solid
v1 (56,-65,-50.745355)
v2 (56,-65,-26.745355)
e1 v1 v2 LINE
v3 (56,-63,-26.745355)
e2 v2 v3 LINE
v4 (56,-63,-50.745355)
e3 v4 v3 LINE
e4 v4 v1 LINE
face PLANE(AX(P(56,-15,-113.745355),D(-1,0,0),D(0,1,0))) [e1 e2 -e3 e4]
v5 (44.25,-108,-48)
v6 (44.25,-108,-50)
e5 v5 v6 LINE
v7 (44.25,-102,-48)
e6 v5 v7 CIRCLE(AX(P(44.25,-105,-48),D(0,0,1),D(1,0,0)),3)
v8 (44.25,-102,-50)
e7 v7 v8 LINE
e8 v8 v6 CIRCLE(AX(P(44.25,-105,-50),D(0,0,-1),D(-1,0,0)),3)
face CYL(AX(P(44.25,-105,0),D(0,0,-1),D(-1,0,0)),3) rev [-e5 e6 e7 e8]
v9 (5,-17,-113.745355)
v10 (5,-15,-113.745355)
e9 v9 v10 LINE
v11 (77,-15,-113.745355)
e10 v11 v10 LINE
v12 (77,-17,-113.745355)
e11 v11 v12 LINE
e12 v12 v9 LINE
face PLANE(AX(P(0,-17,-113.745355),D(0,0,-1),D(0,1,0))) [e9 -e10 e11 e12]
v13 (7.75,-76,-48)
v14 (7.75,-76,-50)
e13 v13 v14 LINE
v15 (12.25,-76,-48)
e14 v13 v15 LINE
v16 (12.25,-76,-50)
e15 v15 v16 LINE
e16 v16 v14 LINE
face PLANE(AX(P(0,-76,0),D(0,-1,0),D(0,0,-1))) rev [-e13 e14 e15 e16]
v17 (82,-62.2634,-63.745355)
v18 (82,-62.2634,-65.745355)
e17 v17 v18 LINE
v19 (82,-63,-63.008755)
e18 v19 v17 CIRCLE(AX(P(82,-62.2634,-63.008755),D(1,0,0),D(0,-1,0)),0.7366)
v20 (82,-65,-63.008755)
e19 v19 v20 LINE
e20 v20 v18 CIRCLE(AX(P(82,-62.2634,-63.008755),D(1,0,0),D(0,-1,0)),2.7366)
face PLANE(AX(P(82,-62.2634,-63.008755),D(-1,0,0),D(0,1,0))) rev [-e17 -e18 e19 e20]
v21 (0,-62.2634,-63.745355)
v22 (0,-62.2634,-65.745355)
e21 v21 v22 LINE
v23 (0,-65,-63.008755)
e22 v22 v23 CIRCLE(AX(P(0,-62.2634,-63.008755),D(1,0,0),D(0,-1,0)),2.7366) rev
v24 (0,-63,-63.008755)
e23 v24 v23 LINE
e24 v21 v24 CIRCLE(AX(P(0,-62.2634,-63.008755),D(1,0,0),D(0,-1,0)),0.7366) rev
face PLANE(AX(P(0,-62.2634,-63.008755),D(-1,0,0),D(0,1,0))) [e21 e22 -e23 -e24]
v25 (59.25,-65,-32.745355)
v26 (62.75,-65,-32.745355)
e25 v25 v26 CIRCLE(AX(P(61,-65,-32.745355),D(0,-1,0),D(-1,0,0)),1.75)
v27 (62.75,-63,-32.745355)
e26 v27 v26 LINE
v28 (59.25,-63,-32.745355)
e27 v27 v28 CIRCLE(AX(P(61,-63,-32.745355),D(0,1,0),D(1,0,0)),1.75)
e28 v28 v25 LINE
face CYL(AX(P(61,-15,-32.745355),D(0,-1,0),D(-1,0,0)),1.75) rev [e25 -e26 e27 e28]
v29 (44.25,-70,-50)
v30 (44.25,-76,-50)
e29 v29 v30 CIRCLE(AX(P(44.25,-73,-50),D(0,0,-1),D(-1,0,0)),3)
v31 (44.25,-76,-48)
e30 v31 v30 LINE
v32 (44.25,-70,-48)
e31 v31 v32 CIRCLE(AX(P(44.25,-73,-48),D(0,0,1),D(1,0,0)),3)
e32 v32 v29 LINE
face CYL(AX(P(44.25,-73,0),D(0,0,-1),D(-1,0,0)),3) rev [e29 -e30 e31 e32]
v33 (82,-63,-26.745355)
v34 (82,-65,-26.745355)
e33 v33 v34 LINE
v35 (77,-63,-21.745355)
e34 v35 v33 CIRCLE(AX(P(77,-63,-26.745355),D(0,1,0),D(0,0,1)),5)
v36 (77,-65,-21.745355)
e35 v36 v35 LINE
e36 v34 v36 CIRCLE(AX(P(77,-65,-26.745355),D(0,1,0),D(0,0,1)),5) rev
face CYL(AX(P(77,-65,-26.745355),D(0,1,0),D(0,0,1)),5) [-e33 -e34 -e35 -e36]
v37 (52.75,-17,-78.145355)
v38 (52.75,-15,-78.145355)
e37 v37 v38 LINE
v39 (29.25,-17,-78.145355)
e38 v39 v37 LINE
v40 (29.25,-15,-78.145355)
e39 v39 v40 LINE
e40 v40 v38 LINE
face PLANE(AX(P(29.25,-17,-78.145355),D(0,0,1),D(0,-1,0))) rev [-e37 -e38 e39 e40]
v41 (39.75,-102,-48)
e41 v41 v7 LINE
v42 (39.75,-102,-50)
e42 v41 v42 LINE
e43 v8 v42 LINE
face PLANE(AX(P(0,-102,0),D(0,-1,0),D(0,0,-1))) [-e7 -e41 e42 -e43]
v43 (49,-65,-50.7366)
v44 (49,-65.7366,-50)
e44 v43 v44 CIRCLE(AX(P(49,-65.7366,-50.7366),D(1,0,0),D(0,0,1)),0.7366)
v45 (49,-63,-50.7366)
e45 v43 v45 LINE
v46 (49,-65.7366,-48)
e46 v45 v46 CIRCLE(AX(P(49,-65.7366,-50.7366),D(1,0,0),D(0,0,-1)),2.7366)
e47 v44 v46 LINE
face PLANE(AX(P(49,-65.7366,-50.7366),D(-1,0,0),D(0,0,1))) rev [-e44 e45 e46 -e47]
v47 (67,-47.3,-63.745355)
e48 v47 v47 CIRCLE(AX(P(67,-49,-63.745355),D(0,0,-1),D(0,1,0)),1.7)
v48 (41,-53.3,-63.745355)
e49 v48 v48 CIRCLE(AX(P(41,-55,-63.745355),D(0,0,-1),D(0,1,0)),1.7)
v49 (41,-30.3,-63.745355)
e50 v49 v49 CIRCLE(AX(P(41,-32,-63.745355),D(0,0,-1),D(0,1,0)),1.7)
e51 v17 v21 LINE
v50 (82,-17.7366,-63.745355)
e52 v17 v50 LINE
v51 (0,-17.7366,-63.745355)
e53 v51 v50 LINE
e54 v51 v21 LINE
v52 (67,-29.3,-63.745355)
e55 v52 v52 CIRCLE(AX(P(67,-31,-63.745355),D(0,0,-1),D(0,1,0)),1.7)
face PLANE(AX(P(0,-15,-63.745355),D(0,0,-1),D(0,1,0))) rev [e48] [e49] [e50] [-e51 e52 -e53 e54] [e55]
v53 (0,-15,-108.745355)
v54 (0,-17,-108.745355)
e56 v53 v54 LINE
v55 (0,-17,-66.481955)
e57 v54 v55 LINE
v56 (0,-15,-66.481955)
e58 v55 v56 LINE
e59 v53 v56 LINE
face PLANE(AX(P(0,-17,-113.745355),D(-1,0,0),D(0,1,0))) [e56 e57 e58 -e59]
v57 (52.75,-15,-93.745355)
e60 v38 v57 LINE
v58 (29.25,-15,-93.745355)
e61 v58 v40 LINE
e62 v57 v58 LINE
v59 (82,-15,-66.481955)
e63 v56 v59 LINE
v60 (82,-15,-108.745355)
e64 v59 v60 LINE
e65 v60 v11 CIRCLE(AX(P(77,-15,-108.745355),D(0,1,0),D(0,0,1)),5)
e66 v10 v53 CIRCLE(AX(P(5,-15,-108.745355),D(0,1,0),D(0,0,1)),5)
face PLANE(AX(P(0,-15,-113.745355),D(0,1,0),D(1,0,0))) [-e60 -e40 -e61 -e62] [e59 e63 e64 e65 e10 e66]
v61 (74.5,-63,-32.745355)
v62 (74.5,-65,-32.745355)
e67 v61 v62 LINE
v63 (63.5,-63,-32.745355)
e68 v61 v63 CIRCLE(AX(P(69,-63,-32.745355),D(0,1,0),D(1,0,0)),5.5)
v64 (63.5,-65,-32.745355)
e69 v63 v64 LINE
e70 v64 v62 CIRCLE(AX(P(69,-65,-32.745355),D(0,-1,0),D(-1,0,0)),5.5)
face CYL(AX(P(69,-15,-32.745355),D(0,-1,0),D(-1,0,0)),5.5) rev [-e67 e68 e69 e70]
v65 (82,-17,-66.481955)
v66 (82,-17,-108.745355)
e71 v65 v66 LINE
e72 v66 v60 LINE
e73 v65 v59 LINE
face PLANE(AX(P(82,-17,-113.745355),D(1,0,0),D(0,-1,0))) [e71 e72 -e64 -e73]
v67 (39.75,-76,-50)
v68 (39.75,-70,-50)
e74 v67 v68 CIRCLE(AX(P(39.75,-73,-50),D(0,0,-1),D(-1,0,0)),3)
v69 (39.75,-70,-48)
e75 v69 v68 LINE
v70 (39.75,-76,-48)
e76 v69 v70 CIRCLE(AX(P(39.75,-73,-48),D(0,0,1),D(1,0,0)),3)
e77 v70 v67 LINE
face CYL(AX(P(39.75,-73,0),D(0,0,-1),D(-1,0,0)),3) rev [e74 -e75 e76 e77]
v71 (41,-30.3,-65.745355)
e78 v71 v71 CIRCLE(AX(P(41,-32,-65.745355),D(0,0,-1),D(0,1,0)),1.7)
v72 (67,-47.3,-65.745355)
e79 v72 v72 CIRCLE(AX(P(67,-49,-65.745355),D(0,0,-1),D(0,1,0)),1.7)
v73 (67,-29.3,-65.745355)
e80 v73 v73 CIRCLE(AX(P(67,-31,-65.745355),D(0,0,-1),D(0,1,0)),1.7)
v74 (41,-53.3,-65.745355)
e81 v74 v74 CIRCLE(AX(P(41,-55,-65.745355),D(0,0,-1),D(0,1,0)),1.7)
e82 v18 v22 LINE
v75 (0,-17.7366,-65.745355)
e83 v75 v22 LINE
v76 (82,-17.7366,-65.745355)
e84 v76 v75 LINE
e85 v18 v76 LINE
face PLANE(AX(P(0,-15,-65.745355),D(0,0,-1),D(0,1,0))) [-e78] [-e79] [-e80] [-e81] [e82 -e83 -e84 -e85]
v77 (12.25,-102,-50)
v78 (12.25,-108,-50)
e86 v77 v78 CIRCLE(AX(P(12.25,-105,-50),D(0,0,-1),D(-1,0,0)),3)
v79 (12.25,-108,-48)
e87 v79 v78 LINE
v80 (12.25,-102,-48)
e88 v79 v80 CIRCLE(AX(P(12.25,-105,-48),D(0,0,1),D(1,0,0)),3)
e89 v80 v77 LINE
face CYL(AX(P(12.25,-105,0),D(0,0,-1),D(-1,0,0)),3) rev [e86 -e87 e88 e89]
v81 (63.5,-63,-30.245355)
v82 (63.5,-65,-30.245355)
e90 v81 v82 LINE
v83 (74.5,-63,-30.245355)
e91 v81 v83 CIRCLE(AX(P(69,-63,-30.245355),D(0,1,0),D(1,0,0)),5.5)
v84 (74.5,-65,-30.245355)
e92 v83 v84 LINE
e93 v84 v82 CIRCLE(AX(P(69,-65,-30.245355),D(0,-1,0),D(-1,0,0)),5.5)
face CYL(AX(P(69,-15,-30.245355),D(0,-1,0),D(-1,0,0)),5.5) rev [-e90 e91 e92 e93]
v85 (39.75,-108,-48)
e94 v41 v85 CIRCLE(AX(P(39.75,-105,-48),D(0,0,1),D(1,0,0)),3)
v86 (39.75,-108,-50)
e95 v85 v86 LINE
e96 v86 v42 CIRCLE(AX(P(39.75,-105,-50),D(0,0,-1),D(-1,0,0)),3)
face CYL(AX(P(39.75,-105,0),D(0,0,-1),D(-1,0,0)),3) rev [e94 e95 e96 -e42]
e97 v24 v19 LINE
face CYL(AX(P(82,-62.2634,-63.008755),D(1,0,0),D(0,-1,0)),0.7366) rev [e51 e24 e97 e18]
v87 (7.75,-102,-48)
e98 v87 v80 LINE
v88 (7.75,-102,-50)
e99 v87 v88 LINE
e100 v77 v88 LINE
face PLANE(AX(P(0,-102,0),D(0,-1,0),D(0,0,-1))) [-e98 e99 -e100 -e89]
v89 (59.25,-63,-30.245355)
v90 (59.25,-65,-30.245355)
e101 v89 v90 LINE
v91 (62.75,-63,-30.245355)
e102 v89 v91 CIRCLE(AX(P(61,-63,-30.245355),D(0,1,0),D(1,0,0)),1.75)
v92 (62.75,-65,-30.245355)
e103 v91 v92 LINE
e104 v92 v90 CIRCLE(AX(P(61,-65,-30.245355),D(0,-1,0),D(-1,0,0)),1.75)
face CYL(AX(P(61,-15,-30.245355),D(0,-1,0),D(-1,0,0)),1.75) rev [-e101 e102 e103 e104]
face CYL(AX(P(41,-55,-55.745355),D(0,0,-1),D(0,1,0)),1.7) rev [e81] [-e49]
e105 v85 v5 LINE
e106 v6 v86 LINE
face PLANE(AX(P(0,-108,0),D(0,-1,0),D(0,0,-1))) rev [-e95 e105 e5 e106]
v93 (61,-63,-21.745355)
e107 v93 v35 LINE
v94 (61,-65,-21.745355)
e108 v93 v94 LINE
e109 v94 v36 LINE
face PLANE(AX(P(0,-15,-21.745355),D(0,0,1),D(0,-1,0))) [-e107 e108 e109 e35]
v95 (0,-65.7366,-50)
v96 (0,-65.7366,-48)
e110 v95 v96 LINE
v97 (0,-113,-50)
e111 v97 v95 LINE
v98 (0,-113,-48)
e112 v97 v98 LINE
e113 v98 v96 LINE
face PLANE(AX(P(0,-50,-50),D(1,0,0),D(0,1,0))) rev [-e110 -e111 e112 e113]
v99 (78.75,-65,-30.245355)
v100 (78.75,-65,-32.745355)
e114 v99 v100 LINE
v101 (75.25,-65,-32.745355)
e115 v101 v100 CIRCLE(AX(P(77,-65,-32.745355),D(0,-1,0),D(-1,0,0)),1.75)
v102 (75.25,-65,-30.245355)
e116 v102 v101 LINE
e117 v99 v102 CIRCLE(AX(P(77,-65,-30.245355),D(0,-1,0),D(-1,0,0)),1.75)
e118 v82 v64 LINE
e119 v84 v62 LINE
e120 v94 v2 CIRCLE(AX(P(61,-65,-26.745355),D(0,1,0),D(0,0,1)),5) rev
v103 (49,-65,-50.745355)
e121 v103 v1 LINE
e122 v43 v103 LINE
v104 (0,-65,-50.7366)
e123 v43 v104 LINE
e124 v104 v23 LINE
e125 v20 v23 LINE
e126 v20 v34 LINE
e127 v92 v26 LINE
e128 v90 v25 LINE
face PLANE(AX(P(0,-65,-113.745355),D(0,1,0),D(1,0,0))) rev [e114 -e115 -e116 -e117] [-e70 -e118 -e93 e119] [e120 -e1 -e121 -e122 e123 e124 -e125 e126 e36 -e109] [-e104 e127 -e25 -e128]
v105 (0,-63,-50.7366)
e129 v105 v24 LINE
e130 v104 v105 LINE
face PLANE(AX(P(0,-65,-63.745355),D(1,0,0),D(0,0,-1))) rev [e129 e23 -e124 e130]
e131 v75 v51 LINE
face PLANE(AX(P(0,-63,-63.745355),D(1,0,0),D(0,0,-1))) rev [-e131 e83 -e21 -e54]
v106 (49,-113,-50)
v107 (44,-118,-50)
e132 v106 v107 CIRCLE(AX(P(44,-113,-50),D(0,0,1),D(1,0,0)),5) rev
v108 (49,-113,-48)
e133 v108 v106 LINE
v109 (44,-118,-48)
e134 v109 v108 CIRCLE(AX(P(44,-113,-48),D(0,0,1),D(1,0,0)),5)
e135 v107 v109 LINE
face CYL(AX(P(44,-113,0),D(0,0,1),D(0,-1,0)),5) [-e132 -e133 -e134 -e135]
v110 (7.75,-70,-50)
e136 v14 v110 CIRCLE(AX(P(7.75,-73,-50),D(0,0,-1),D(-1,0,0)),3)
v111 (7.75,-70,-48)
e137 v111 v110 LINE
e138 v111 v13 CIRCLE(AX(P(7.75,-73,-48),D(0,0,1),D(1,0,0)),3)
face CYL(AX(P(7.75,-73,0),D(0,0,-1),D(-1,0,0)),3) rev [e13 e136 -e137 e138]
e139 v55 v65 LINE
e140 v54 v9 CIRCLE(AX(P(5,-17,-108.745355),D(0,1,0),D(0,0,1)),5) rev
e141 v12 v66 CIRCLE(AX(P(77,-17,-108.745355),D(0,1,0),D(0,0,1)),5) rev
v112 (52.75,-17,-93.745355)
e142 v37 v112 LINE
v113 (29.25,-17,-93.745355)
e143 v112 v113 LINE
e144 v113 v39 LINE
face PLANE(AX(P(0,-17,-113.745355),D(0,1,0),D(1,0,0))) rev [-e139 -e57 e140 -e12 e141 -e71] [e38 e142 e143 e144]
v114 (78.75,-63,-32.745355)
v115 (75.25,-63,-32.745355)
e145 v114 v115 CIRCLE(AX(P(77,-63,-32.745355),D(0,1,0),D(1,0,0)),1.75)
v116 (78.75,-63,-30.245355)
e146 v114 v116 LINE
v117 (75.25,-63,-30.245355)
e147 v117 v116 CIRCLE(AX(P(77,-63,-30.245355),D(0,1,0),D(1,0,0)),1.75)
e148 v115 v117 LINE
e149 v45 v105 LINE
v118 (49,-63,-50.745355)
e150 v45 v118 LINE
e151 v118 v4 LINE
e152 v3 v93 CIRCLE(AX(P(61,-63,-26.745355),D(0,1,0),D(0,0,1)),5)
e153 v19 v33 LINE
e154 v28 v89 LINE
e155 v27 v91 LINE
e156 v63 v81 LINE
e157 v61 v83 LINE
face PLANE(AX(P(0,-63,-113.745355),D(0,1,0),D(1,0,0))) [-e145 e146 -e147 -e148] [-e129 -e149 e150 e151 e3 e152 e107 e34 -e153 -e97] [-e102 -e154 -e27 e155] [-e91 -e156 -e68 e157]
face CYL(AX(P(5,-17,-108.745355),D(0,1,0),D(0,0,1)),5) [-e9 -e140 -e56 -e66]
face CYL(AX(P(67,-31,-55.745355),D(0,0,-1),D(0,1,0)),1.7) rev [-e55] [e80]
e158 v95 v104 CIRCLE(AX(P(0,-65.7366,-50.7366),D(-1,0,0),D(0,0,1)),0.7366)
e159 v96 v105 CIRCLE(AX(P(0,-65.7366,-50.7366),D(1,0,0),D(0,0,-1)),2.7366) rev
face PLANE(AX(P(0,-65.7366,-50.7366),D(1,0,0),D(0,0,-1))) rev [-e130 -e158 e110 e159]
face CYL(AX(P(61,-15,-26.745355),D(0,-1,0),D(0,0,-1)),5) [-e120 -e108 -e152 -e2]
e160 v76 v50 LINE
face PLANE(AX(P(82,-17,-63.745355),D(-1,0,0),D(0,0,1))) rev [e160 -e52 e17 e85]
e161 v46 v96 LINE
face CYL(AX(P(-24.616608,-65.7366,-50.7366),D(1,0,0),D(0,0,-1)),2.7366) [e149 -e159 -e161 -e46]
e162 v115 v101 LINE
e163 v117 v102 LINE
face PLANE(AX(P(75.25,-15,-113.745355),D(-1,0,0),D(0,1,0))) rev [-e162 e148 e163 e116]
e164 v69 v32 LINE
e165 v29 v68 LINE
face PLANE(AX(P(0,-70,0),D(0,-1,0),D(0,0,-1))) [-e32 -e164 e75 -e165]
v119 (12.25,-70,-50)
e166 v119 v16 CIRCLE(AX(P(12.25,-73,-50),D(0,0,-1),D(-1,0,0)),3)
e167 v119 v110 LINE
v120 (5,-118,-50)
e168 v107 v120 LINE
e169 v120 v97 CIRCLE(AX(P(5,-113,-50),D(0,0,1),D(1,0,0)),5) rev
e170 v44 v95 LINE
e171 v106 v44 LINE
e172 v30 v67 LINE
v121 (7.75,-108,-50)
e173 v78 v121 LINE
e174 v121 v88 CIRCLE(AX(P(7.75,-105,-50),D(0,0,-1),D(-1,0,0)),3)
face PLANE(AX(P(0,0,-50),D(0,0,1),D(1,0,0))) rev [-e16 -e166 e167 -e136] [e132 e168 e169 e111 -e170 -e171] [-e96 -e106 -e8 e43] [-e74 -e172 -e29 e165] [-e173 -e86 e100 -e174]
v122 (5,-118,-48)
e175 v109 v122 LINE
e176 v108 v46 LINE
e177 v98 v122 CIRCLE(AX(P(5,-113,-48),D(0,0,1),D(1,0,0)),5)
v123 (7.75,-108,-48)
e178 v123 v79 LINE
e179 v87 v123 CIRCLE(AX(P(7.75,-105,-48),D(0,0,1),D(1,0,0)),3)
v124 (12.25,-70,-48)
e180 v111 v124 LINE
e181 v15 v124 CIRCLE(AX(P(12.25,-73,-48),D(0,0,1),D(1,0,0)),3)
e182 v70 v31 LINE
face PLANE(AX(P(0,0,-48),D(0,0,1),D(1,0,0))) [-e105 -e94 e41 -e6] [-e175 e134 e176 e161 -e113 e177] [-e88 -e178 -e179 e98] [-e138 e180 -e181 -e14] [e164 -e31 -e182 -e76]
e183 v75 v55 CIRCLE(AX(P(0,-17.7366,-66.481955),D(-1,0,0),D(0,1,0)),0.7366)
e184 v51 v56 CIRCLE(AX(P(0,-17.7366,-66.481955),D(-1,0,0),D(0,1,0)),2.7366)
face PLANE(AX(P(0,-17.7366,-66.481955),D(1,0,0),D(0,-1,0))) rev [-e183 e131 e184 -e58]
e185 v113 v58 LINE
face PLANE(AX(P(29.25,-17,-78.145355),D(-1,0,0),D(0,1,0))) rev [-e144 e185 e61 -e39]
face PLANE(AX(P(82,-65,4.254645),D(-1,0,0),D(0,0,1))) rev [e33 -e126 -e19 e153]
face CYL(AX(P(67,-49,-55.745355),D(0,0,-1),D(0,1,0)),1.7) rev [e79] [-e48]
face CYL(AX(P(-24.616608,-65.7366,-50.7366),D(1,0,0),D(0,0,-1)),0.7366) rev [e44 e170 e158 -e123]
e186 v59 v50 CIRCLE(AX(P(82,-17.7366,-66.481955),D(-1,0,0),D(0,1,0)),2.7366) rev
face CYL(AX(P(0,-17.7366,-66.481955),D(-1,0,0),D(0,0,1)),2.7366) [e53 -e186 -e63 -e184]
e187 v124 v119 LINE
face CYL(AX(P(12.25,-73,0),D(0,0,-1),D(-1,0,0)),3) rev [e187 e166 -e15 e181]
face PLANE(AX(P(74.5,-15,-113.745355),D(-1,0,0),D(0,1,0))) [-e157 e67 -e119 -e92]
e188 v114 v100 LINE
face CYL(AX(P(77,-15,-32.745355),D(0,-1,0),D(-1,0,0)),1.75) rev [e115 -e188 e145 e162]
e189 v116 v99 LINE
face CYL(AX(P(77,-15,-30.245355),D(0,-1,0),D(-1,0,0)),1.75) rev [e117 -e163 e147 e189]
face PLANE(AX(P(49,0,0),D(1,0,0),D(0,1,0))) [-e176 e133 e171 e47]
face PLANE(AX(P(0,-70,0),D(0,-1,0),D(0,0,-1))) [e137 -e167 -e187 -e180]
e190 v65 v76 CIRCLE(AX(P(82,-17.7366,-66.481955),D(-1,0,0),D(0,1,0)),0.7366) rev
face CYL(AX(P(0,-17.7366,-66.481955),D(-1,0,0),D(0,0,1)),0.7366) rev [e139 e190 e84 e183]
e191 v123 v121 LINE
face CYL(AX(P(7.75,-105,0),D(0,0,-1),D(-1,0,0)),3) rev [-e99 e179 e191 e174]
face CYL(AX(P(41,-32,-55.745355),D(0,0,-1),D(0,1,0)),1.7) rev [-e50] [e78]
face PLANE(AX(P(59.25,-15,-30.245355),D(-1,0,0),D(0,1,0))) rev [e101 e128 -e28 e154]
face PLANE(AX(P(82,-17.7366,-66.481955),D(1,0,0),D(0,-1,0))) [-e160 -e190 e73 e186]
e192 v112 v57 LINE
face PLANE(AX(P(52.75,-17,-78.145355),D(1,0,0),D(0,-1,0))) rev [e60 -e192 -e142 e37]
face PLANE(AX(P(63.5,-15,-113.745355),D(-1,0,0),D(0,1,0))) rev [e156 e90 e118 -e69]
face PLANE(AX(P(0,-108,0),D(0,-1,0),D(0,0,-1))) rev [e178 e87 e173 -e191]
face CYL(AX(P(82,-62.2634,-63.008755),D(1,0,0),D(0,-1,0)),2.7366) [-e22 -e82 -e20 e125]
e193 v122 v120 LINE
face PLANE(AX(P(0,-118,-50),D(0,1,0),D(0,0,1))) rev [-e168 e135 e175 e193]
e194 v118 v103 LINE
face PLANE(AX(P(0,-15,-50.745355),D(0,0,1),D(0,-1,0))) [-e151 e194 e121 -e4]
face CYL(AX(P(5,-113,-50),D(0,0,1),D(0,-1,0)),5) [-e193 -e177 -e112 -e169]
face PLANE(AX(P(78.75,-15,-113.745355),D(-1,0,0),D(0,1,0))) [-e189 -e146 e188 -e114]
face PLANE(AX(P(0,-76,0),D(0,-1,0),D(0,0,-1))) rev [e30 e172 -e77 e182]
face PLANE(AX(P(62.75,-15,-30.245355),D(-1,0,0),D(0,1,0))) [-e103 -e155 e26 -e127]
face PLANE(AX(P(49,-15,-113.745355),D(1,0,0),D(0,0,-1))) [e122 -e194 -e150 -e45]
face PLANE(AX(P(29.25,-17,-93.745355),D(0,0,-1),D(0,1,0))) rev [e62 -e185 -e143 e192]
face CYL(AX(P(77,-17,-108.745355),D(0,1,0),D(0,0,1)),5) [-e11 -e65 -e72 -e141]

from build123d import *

# Parameters (mm, degrees)
SKETCH1_W                    = 82
SKETCH1_H                    = 50
SKETCH1_W_2                  = 23.5
SKETCH1_H_2                  = 15.6
BASE_FLANGE1_DEPTH           = 2
EDGE_FLANGE1_STRIP_W         = 9.4732
EDGE_FLANGE1_STRIP_H         = 2
EDGE_FLANGE1_STRIP_CUT_DEPTH = 82
EDGE_FLANGE1_DEPTH           = 82
EDGE_FLANGE2_STRIP_W         = 9.4732
EDGE_FLANGE2_STRIP_H         = 2
EDGE_FLANGE2_STRIP_CUT_DEPTH = 82
EDGE_FLANGE2_DEPTH           = 82
CUT_EXTRUDE1_DEPTH           = 153.144667997
CUT_EXTRUDE1_DEPTH_BACK      = 153.144667997
SKETCHED_START               = -63
SKETCHED_BEND2_OUTLINE_W     = 82
SKETCHED_BEND2_OUTLINE_H     = 50
SKETCHED_BEND2_DEPTH         = 63
SKETCHED_START_2             = -92
SKETCHED_BEND2_2_OUTLINE_W   = 26
SKETCHED_BEND2_2_OUTLINE_H   = 2
SKETCHED_BEND2_2_DEPTH       = 27
SKETCHED_START_3             = -62.2634
SKETCHED_BEND2_3_OUTLINE_W   = 82
SKETCHED_BEND2_3_OUTLINE_H   = 2
SKETCHED_BEND2_3_DEPTH       = 44.5268
SKETCHED_START_4             = -65
SKETCHED_BEND2_4_OUTLINE_W   = 26
SKETCHED_BEND2_4_OUTLINE_H   = 26.254644901
SKETCHED_BEND2_4_DEPTH       = 2
SKETCHED_BEND2_5_DEPTH       = 49
SKETCHED_BEND2_6_OUTLINE_W   = 2
SKETCHED_BEND2_6_OUTLINE_H   = 20
SKETCHED_BEND2_6_DEPTH       = 82
SKETCHED_BEND2_7_OUTLINE_W   = 2
SKETCHED_BEND2_7_OUTLINE_H   = 15.6
SKETCHED_BEND2_7_DEPTH       = 29.25
SKETCHED_START_5             = 52.75
SKETCHED_BEND2_8_OUTLINE_W   = 2
SKETCHED_BEND2_8_OUTLINE_H   = 15.6
SKETCHED_BEND2_8_DEPTH       = 29.25
SKETCHED_START_6             = 56
SKETCHED_BEND2_9_OUTLINE_W   = 2
SKETCHED_BEND2_9_OUTLINE_H   = 0.745355099
SKETCHED_BEND2_9_DEPTH       = 26
SKETCHED_START_7             = 29.25
SKETCHED_BEND2_10_DEPTH      = 19.75
FILLET1_R                    = 5
SKETCH19_R                   = 1.7
CUT_EXTRUDE2_DEPTH           = 10


with BuildPart() as part:
    # Base-Flange1: sheet metal written as solids
    # Sketch1 → Base-Flange1 (new body)
    with BuildSketch(Plane.XY):
        with Locations((41, -25)):
            Rectangle(SKETCH1_W, SKETCH1_H)
        with Locations((41, -27.8)):
            Rectangle(SKETCH1_W_2, SKETCH1_H_2, mode=Mode.SUBTRACT)
    extrude(amount=-BASE_FLANGE1_DEPTH)

    # Edge-Flange1: sheet metal written as solids
    # Edge-Flange1 strip (on a plane across the edge) → Edge-Flange1 strip cut (cut)
    with BuildSketch(Plane(origin=(82, -50, -2), x_dir=(0, 1, 0), z_dir=(-1, 0, 0))):
        with Locations((-2, -1)):
            Rectangle(EDGE_FLANGE1_STRIP_W, EDGE_FLANGE1_STRIP_H)
    extrude(amount=EDGE_FLANGE1_STRIP_CUT_DEPTH, mode=Mode.SUBTRACT)

    # Edge-Flange1 section (on a plane across the edge) → Edge-Flange1 (add)
    with BuildSketch(Plane(origin=(82, -50, -2), x_dir=(0, 1, 0), z_dir=(-1, 0, 0))):
        with BuildLine():
            Line((0, 0.7366), (0, 46))
            Line((0, 46), (2, 46))
            Line((2, 46), (2, 0.7366))
            ThreePointArc((2, 0.7366), (2.215745145, 0.215745145), (2.7366, 0))
            Line((2.7366, 0), (2.7366, -2))
            ThreePointArc((2.7366, -2), (0.801531583, -1.198468417), (0, 0.7366))
        make_face()
    extrude(amount=EDGE_FLANGE1_DEPTH)

    # Edge-Flange2: sheet metal written as solids
    # Edge-Flange2 strip (on a plane across the edge) → Edge-Flange2 strip cut (cut)
    with BuildSketch(Plane(origin=(0, -50, -48), x_dir=(0, 0, 1), z_dir=(1, 0, 0))):
        with Locations((-4, -1)):
            Rectangle(EDGE_FLANGE2_STRIP_W, EDGE_FLANGE2_STRIP_H)
    extrude(amount=EDGE_FLANGE2_STRIP_CUT_DEPTH, mode=Mode.SUBTRACT)

    # Edge-Flange2 section (on a plane across the edge) → Edge-Flange2 (add)
    with BuildSketch(Plane(origin=(0, -50, -48), x_dir=(0, 0, 1), z_dir=(1, 0, 0))):
        with BuildLine():
            Line((-2, 0.7366), (-2, 68))
            Line((-2, 68), (0, 68))
            Line((0, 68), (0, 0.7366))
            ThreePointArc((0, 0.7366), (0.215745145, 0.215745145), (0.7366, 0))
            Line((0.7366, 0), (0.7366, -2))
            ThreePointArc((0.7366, -2), (-1.198468417, -1.198468417), (-2, 0.7366))
        make_face()
    extrude(amount=EDGE_FLANGE2_DEPTH)

    # Sketch12 → Cut-Extrude1 (cut, two sides: drawn at the far end of the back side and taken through both)
    with BuildSketch(Plane(origin=(0, 0, -50), x_dir=(-1, 0, 0), z_dir=(0, 0, -1)).offset(-CUT_EXTRUDE1_DEPTH_BACK)):
        Polygon((-56, -92), (-82, -92), (-82, -118), (-49, -118), (-49, -63), (-56, -63), align=None)
        with BuildLine():
            Line((-75.25, -83.5), (-75.25, -81))
            ThreePointArc((-75.25, -81), (-77, -79.25), (-78.75, -81))
            Line((-78.75, -81), (-78.75, -83.5))
            ThreePointArc((-78.75, -83.5), (-77, -85.25), (-75.25, -83.5))
        make_face()
        with BuildLine():
            Line((-63.5, -83.5), (-63.5, -81))
            ThreePointArc((-63.5, -81), (-69, -75.5), (-74.5, -81))
            Line((-74.5, -81), (-74.5, -83.5))
            ThreePointArc((-74.5, -83.5), (-69, -89), (-63.5, -83.5))
        make_face()
        with BuildLine():
            Line((-44.25, -76), (-39.75, -76))
            ThreePointArc((-39.75, -76), (-36.75, -73), (-39.75, -70))
            Line((-39.75, -70), (-44.25, -70))
            ThreePointArc((-44.25, -70), (-47.25, -73), (-44.25, -76))
        make_face()
        with BuildLine():
            Line((-12.25, -76), (-7.75, -76))
            ThreePointArc((-7.75, -76), (-4.75, -73), (-7.75, -70))
            Line((-7.75, -70), (-12.25, -70))
            ThreePointArc((-12.25, -70), (-15.25, -73), (-12.25, -76))
        make_face()
        with BuildLine():
            Line((-12.25, -108), (-7.75, -108))
            ThreePointArc((-7.75, -108), (-4.75, -105), (-7.75, -102))
            Line((-7.75, -102), (-12.25, -102))
            ThreePointArc((-12.25, -102), (-15.25, -105), (-12.25, -108))
        make_face()
        with BuildLine():
            Line((-44.25, -108), (-39.75, -108))
            ThreePointArc((-39.75, -108), (-36.75, -105), (-39.75, -102))
            Line((-39.75, -102), (-44.25, -102))
            ThreePointArc((-44.25, -102), (-47.25, -105), (-44.25, -108))
        make_face()
        with BuildLine():
            ThreePointArc((-59.25, -81), (-61, -79.25), (-62.75, -81))
            Line((-62.75, -81), (-62.75, -83.5))
            ThreePointArc((-62.75, -83.5), (-61, -85.25), (-59.25, -83.5))
            Line((-59.25, -83.5), (-59.25, -81))
        make_face()
    extrude(amount=CUT_EXTRUDE1_DEPTH + CUT_EXTRUDE1_DEPTH_BACK, mode=Mode.SUBTRACT)

    # Sketched Bend2: read off the stored shape, not the designer's step
    # Sketched Bend2 outline → Sketched Bend2 (cut)
    with BuildSketch(Plane(origin=(0, 0, 0), x_dir=(1, 0, 0), z_dir=(0, 1, 0)).offset(SKETCHED_START)):
        with Locations((41, 25)):
            Rectangle(SKETCHED_BEND2_OUTLINE_W, SKETCHED_BEND2_OUTLINE_H)
    extrude(amount=SKETCHED_BEND2_DEPTH, mode=Mode.SUBTRACT)

    # Sketched Bend2 2 outline → Sketched Bend2 2 (cut)
    with BuildSketch(Plane(origin=(0, 0, 0), x_dir=(1, 0, 0), z_dir=(0, 1, 0)).offset(SKETCHED_START_2)):
        with Locations((69, 49)):
            Rectangle(SKETCHED_BEND2_2_OUTLINE_W, SKETCHED_BEND2_2_OUTLINE_H)
    extrude(amount=SKETCHED_BEND2_2_DEPTH, mode=Mode.SUBTRACT)

    # Sketched Bend2 4 outline → Sketched Bend2 4 (add)
    with BuildSketch(Plane(origin=(0, 0, 0), x_dir=(1, 0, 0), z_dir=(0, 1, 0)).offset(SKETCHED_START_4)):
        with Locations((69, 34.872677549)):
            Rectangle(SKETCHED_BEND2_4_OUTLINE_W, SKETCHED_BEND2_4_OUTLINE_H)
        with BuildLine():
            Line((59.25, 30.245355099), (59.25, 32.745355099))
            ThreePointArc((59.25, 32.745355099), (61, 34.495355099), (62.75, 32.745355099))
            Line((62.75, 32.745355099), (62.75, 30.245355099))
            ThreePointArc((62.75, 30.245355099), (61, 28.495355099), (59.25, 30.245355099))
        make_face(mode=Mode.SUBTRACT)
        with BuildLine():
            Line((63.5, 30.245355099), (63.5, 32.745355099))
            ThreePointArc((63.5, 32.745355099), (69, 38.245355099), (74.5, 32.745355099))
            Line((74.5, 32.745355099), (74.5, 30.245355099))
            ThreePointArc((74.5, 30.245355099), (69, 24.745355099), (63.5, 30.245355099))
        make_face(mode=Mode.SUBTRACT)
        with BuildLine():
            Line((75.25, 30.245355099), (75.25, 32.745355099))
            ThreePointArc((75.25, 32.745355099), (77, 34.495355099), (78.75, 32.745355099))
            Line((78.75, 32.745355099), (78.75, 30.245355099))
            ThreePointArc((78.75, 30.245355099), (77, 28.495355099), (75.25, 30.245355099))
        make_face(mode=Mode.SUBTRACT)
    extrude(amount=SKETCHED_BEND2_4_DEPTH)

    # Sketched Bend2 5 outline → Sketched Bend2 5 (cut)
    with BuildSketch(Plane.YZ):
        with BuildLine():
            ThreePointArc((-65.7366, -48), (-64.082332791, -48.556604688), (-63.100997602, -50))
            Line((-63.100997602, -50), (-63, -50))
            Line((-63, -50), (-63, -48))
            Line((-63, -48), (-65.7366, -48))
        make_face()
    extrude(amount=SKETCHED_BEND2_5_DEPTH, mode=Mode.SUBTRACT)



with BuildPart() as body_2:
    # Sketched Bend2 3 outline → Sketched Bend2 3 (new body)
    with BuildSketch(Plane(origin=(0, 0, 0), x_dir=(1, 0, 0), z_dir=(0, 1, 0)).offset(SKETCHED_START_3)):
        with Locations((41, 64.745355099)):
            Rectangle(SKETCHED_BEND2_3_OUTLINE_W, SKETCHED_BEND2_3_OUTLINE_H)
    extrude(amount=SKETCHED_BEND2_3_DEPTH)

    # Sketched Bend2 6 outline → Sketched Bend2 6 (add)
    with BuildSketch(Plane.YZ):
        with BuildLine():
            Line((-65, -50.745355099), (-65, -63.008755099))
            ThreePointArc((-65, -63.008755099), (-64.198468417, -64.943823516), (-62.2634, -65.745355099))
            Line((-62.2634, -65.745355099), (-62.2634, -63.745355099))
            ThreePointArc((-62.2634, -63.745355099), (-62.784254855, -63.529609954), (-63, -63.008755099))
            Line((-63, -63.008755099), (-63, -50.745355099))
            Line((-63, -50.745355099), (-65, -50.745355099))
        make_face()
        with Locations((-16, -103.745355099)):
            Rectangle(SKETCHED_BEND2_6_OUTLINE_W, SKETCHED_BEND2_6_OUTLINE_H)
        with BuildLine():
            Line((-17, -66.481955099), (-17, -78.145355099))
            Line((-17, -78.145355099), (-15, -78.145355099))
            Line((-15, -78.145355099), (-15, -66.481955099))
            ThreePointArc((-15, -66.481955099), (-15.801531582, -64.546886681), (-17.7366, -63.745355099))
            Line((-17.7366, -63.745355099), (-17.7366, -65.745355099))
            ThreePointArc((-17.7366, -65.745355099), (-17.215745145, -65.961100244), (-17, -66.481955099))
        make_face()
    extrude(amount=SKETCHED_BEND2_6_DEPTH)


with BuildPart() as part_1:
    add(part.part)

    add(body_2.part)  # Sketched Bend2 7 merges body 2
    # Sketched Bend2 7 outline → Sketched Bend2 7 (add)
    with BuildSketch(Plane.YZ):
        with BuildLine():
            Line((-65, -50.7366), (-65, -50.745355099))
            Line((-65, -50.745355099), (-63, -50.745355099))
            Line((-63, -50.745355099), (-63, -50.7366))
            ThreePointArc((-63, -50.7366), (-63.025366971, -50.364854094), (-63.100997602, -50))
            Line((-63.100997602, -50), (-65.7366, -50))
            ThreePointArc((-65.7366, -50), (-65.215745145, -50.215745145), (-65, -50.7366))
        make_face()
        with Locations((-16, -85.945355099)):
            Rectangle(SKETCHED_BEND2_7_OUTLINE_W, SKETCHED_BEND2_7_OUTLINE_H)
    extrude(amount=SKETCHED_BEND2_7_DEPTH)

    # Sketched Bend2 8 outline → Sketched Bend2 8 (add)
    with BuildSketch(Plane.YZ.offset(SKETCHED_START_5)):
        with Locations((-16, -85.945355099)):
            Rectangle(SKETCHED_BEND2_8_OUTLINE_W, SKETCHED_BEND2_8_OUTLINE_H)
    extrude(amount=SKETCHED_BEND2_8_DEPTH)

    # Sketched Bend2 9 outline → Sketched Bend2 9 (add)
    with BuildSketch(Plane.YZ.offset(SKETCHED_START_6)):
        with Locations((-64, -50.372677549)):
            Rectangle(SKETCHED_BEND2_9_OUTLINE_W, SKETCHED_BEND2_9_OUTLINE_H)
    extrude(amount=SKETCHED_BEND2_9_DEPTH)

    # Sketched Bend2 10 outline → Sketched Bend2 10 (add)
    with BuildSketch(Plane.YZ.offset(SKETCHED_START_7)):
        with BuildLine():
            Line((-65, -50.7366), (-65, -50.745355099))
            Line((-65, -50.745355099), (-63, -50.745355099))
            Line((-63, -50.745355099), (-63, -50.7366))
            ThreePointArc((-63, -50.7366), (-63.025366971, -50.364854094), (-63.100997602, -50))
            Line((-63.100997602, -50), (-65.7366, -50))
            ThreePointArc((-65.7366, -50), (-65.215745145, -50.215745145), (-65, -50.7366))
        make_face()
    extrude(amount=SKETCHED_BEND2_10_DEPTH)

    # Fillet1
    fillet1_edges = [part_1.edges().sort_by_distance(p)[0] for p in [
        (82, -64, -21.745355099),
        (56, -64, -21.745355099),
        (49, -118, -49),
        (0, -118, -49),
        (0, -16, -113.745355099),
        (82, -16, -113.745355099),
    ]]
    fillet(fillet1_edges, radius=FILLET1_R)

    # Sketch19 → Cut-Extrude2 (cut)
    with BuildSketch(Plane(origin=(0, 0, -65.745355099), x_dir=(-1, 0, 0), z_dir=(0, 0, -1))):
        with Locations(Location((-41, -32, 0), (0, 0, 90))):
            Circle(SKETCH19_R)
        with Locations(Location((-41, -55, 0), (0, 0, 90))):
            Circle(SKETCH19_R)
        with Locations(Location((-67, -31, 0), (0, 0, 90))):
            Circle(SKETCH19_R)
        with Locations(Location((-67, -49, 0), (0, 0, 90))):
            Circle(SKETCH19_R)
    extrude(amount=-CUT_EXTRUDE2_DEPTH, mode=Mode.SUBTRACT)


solid = part_1.part
